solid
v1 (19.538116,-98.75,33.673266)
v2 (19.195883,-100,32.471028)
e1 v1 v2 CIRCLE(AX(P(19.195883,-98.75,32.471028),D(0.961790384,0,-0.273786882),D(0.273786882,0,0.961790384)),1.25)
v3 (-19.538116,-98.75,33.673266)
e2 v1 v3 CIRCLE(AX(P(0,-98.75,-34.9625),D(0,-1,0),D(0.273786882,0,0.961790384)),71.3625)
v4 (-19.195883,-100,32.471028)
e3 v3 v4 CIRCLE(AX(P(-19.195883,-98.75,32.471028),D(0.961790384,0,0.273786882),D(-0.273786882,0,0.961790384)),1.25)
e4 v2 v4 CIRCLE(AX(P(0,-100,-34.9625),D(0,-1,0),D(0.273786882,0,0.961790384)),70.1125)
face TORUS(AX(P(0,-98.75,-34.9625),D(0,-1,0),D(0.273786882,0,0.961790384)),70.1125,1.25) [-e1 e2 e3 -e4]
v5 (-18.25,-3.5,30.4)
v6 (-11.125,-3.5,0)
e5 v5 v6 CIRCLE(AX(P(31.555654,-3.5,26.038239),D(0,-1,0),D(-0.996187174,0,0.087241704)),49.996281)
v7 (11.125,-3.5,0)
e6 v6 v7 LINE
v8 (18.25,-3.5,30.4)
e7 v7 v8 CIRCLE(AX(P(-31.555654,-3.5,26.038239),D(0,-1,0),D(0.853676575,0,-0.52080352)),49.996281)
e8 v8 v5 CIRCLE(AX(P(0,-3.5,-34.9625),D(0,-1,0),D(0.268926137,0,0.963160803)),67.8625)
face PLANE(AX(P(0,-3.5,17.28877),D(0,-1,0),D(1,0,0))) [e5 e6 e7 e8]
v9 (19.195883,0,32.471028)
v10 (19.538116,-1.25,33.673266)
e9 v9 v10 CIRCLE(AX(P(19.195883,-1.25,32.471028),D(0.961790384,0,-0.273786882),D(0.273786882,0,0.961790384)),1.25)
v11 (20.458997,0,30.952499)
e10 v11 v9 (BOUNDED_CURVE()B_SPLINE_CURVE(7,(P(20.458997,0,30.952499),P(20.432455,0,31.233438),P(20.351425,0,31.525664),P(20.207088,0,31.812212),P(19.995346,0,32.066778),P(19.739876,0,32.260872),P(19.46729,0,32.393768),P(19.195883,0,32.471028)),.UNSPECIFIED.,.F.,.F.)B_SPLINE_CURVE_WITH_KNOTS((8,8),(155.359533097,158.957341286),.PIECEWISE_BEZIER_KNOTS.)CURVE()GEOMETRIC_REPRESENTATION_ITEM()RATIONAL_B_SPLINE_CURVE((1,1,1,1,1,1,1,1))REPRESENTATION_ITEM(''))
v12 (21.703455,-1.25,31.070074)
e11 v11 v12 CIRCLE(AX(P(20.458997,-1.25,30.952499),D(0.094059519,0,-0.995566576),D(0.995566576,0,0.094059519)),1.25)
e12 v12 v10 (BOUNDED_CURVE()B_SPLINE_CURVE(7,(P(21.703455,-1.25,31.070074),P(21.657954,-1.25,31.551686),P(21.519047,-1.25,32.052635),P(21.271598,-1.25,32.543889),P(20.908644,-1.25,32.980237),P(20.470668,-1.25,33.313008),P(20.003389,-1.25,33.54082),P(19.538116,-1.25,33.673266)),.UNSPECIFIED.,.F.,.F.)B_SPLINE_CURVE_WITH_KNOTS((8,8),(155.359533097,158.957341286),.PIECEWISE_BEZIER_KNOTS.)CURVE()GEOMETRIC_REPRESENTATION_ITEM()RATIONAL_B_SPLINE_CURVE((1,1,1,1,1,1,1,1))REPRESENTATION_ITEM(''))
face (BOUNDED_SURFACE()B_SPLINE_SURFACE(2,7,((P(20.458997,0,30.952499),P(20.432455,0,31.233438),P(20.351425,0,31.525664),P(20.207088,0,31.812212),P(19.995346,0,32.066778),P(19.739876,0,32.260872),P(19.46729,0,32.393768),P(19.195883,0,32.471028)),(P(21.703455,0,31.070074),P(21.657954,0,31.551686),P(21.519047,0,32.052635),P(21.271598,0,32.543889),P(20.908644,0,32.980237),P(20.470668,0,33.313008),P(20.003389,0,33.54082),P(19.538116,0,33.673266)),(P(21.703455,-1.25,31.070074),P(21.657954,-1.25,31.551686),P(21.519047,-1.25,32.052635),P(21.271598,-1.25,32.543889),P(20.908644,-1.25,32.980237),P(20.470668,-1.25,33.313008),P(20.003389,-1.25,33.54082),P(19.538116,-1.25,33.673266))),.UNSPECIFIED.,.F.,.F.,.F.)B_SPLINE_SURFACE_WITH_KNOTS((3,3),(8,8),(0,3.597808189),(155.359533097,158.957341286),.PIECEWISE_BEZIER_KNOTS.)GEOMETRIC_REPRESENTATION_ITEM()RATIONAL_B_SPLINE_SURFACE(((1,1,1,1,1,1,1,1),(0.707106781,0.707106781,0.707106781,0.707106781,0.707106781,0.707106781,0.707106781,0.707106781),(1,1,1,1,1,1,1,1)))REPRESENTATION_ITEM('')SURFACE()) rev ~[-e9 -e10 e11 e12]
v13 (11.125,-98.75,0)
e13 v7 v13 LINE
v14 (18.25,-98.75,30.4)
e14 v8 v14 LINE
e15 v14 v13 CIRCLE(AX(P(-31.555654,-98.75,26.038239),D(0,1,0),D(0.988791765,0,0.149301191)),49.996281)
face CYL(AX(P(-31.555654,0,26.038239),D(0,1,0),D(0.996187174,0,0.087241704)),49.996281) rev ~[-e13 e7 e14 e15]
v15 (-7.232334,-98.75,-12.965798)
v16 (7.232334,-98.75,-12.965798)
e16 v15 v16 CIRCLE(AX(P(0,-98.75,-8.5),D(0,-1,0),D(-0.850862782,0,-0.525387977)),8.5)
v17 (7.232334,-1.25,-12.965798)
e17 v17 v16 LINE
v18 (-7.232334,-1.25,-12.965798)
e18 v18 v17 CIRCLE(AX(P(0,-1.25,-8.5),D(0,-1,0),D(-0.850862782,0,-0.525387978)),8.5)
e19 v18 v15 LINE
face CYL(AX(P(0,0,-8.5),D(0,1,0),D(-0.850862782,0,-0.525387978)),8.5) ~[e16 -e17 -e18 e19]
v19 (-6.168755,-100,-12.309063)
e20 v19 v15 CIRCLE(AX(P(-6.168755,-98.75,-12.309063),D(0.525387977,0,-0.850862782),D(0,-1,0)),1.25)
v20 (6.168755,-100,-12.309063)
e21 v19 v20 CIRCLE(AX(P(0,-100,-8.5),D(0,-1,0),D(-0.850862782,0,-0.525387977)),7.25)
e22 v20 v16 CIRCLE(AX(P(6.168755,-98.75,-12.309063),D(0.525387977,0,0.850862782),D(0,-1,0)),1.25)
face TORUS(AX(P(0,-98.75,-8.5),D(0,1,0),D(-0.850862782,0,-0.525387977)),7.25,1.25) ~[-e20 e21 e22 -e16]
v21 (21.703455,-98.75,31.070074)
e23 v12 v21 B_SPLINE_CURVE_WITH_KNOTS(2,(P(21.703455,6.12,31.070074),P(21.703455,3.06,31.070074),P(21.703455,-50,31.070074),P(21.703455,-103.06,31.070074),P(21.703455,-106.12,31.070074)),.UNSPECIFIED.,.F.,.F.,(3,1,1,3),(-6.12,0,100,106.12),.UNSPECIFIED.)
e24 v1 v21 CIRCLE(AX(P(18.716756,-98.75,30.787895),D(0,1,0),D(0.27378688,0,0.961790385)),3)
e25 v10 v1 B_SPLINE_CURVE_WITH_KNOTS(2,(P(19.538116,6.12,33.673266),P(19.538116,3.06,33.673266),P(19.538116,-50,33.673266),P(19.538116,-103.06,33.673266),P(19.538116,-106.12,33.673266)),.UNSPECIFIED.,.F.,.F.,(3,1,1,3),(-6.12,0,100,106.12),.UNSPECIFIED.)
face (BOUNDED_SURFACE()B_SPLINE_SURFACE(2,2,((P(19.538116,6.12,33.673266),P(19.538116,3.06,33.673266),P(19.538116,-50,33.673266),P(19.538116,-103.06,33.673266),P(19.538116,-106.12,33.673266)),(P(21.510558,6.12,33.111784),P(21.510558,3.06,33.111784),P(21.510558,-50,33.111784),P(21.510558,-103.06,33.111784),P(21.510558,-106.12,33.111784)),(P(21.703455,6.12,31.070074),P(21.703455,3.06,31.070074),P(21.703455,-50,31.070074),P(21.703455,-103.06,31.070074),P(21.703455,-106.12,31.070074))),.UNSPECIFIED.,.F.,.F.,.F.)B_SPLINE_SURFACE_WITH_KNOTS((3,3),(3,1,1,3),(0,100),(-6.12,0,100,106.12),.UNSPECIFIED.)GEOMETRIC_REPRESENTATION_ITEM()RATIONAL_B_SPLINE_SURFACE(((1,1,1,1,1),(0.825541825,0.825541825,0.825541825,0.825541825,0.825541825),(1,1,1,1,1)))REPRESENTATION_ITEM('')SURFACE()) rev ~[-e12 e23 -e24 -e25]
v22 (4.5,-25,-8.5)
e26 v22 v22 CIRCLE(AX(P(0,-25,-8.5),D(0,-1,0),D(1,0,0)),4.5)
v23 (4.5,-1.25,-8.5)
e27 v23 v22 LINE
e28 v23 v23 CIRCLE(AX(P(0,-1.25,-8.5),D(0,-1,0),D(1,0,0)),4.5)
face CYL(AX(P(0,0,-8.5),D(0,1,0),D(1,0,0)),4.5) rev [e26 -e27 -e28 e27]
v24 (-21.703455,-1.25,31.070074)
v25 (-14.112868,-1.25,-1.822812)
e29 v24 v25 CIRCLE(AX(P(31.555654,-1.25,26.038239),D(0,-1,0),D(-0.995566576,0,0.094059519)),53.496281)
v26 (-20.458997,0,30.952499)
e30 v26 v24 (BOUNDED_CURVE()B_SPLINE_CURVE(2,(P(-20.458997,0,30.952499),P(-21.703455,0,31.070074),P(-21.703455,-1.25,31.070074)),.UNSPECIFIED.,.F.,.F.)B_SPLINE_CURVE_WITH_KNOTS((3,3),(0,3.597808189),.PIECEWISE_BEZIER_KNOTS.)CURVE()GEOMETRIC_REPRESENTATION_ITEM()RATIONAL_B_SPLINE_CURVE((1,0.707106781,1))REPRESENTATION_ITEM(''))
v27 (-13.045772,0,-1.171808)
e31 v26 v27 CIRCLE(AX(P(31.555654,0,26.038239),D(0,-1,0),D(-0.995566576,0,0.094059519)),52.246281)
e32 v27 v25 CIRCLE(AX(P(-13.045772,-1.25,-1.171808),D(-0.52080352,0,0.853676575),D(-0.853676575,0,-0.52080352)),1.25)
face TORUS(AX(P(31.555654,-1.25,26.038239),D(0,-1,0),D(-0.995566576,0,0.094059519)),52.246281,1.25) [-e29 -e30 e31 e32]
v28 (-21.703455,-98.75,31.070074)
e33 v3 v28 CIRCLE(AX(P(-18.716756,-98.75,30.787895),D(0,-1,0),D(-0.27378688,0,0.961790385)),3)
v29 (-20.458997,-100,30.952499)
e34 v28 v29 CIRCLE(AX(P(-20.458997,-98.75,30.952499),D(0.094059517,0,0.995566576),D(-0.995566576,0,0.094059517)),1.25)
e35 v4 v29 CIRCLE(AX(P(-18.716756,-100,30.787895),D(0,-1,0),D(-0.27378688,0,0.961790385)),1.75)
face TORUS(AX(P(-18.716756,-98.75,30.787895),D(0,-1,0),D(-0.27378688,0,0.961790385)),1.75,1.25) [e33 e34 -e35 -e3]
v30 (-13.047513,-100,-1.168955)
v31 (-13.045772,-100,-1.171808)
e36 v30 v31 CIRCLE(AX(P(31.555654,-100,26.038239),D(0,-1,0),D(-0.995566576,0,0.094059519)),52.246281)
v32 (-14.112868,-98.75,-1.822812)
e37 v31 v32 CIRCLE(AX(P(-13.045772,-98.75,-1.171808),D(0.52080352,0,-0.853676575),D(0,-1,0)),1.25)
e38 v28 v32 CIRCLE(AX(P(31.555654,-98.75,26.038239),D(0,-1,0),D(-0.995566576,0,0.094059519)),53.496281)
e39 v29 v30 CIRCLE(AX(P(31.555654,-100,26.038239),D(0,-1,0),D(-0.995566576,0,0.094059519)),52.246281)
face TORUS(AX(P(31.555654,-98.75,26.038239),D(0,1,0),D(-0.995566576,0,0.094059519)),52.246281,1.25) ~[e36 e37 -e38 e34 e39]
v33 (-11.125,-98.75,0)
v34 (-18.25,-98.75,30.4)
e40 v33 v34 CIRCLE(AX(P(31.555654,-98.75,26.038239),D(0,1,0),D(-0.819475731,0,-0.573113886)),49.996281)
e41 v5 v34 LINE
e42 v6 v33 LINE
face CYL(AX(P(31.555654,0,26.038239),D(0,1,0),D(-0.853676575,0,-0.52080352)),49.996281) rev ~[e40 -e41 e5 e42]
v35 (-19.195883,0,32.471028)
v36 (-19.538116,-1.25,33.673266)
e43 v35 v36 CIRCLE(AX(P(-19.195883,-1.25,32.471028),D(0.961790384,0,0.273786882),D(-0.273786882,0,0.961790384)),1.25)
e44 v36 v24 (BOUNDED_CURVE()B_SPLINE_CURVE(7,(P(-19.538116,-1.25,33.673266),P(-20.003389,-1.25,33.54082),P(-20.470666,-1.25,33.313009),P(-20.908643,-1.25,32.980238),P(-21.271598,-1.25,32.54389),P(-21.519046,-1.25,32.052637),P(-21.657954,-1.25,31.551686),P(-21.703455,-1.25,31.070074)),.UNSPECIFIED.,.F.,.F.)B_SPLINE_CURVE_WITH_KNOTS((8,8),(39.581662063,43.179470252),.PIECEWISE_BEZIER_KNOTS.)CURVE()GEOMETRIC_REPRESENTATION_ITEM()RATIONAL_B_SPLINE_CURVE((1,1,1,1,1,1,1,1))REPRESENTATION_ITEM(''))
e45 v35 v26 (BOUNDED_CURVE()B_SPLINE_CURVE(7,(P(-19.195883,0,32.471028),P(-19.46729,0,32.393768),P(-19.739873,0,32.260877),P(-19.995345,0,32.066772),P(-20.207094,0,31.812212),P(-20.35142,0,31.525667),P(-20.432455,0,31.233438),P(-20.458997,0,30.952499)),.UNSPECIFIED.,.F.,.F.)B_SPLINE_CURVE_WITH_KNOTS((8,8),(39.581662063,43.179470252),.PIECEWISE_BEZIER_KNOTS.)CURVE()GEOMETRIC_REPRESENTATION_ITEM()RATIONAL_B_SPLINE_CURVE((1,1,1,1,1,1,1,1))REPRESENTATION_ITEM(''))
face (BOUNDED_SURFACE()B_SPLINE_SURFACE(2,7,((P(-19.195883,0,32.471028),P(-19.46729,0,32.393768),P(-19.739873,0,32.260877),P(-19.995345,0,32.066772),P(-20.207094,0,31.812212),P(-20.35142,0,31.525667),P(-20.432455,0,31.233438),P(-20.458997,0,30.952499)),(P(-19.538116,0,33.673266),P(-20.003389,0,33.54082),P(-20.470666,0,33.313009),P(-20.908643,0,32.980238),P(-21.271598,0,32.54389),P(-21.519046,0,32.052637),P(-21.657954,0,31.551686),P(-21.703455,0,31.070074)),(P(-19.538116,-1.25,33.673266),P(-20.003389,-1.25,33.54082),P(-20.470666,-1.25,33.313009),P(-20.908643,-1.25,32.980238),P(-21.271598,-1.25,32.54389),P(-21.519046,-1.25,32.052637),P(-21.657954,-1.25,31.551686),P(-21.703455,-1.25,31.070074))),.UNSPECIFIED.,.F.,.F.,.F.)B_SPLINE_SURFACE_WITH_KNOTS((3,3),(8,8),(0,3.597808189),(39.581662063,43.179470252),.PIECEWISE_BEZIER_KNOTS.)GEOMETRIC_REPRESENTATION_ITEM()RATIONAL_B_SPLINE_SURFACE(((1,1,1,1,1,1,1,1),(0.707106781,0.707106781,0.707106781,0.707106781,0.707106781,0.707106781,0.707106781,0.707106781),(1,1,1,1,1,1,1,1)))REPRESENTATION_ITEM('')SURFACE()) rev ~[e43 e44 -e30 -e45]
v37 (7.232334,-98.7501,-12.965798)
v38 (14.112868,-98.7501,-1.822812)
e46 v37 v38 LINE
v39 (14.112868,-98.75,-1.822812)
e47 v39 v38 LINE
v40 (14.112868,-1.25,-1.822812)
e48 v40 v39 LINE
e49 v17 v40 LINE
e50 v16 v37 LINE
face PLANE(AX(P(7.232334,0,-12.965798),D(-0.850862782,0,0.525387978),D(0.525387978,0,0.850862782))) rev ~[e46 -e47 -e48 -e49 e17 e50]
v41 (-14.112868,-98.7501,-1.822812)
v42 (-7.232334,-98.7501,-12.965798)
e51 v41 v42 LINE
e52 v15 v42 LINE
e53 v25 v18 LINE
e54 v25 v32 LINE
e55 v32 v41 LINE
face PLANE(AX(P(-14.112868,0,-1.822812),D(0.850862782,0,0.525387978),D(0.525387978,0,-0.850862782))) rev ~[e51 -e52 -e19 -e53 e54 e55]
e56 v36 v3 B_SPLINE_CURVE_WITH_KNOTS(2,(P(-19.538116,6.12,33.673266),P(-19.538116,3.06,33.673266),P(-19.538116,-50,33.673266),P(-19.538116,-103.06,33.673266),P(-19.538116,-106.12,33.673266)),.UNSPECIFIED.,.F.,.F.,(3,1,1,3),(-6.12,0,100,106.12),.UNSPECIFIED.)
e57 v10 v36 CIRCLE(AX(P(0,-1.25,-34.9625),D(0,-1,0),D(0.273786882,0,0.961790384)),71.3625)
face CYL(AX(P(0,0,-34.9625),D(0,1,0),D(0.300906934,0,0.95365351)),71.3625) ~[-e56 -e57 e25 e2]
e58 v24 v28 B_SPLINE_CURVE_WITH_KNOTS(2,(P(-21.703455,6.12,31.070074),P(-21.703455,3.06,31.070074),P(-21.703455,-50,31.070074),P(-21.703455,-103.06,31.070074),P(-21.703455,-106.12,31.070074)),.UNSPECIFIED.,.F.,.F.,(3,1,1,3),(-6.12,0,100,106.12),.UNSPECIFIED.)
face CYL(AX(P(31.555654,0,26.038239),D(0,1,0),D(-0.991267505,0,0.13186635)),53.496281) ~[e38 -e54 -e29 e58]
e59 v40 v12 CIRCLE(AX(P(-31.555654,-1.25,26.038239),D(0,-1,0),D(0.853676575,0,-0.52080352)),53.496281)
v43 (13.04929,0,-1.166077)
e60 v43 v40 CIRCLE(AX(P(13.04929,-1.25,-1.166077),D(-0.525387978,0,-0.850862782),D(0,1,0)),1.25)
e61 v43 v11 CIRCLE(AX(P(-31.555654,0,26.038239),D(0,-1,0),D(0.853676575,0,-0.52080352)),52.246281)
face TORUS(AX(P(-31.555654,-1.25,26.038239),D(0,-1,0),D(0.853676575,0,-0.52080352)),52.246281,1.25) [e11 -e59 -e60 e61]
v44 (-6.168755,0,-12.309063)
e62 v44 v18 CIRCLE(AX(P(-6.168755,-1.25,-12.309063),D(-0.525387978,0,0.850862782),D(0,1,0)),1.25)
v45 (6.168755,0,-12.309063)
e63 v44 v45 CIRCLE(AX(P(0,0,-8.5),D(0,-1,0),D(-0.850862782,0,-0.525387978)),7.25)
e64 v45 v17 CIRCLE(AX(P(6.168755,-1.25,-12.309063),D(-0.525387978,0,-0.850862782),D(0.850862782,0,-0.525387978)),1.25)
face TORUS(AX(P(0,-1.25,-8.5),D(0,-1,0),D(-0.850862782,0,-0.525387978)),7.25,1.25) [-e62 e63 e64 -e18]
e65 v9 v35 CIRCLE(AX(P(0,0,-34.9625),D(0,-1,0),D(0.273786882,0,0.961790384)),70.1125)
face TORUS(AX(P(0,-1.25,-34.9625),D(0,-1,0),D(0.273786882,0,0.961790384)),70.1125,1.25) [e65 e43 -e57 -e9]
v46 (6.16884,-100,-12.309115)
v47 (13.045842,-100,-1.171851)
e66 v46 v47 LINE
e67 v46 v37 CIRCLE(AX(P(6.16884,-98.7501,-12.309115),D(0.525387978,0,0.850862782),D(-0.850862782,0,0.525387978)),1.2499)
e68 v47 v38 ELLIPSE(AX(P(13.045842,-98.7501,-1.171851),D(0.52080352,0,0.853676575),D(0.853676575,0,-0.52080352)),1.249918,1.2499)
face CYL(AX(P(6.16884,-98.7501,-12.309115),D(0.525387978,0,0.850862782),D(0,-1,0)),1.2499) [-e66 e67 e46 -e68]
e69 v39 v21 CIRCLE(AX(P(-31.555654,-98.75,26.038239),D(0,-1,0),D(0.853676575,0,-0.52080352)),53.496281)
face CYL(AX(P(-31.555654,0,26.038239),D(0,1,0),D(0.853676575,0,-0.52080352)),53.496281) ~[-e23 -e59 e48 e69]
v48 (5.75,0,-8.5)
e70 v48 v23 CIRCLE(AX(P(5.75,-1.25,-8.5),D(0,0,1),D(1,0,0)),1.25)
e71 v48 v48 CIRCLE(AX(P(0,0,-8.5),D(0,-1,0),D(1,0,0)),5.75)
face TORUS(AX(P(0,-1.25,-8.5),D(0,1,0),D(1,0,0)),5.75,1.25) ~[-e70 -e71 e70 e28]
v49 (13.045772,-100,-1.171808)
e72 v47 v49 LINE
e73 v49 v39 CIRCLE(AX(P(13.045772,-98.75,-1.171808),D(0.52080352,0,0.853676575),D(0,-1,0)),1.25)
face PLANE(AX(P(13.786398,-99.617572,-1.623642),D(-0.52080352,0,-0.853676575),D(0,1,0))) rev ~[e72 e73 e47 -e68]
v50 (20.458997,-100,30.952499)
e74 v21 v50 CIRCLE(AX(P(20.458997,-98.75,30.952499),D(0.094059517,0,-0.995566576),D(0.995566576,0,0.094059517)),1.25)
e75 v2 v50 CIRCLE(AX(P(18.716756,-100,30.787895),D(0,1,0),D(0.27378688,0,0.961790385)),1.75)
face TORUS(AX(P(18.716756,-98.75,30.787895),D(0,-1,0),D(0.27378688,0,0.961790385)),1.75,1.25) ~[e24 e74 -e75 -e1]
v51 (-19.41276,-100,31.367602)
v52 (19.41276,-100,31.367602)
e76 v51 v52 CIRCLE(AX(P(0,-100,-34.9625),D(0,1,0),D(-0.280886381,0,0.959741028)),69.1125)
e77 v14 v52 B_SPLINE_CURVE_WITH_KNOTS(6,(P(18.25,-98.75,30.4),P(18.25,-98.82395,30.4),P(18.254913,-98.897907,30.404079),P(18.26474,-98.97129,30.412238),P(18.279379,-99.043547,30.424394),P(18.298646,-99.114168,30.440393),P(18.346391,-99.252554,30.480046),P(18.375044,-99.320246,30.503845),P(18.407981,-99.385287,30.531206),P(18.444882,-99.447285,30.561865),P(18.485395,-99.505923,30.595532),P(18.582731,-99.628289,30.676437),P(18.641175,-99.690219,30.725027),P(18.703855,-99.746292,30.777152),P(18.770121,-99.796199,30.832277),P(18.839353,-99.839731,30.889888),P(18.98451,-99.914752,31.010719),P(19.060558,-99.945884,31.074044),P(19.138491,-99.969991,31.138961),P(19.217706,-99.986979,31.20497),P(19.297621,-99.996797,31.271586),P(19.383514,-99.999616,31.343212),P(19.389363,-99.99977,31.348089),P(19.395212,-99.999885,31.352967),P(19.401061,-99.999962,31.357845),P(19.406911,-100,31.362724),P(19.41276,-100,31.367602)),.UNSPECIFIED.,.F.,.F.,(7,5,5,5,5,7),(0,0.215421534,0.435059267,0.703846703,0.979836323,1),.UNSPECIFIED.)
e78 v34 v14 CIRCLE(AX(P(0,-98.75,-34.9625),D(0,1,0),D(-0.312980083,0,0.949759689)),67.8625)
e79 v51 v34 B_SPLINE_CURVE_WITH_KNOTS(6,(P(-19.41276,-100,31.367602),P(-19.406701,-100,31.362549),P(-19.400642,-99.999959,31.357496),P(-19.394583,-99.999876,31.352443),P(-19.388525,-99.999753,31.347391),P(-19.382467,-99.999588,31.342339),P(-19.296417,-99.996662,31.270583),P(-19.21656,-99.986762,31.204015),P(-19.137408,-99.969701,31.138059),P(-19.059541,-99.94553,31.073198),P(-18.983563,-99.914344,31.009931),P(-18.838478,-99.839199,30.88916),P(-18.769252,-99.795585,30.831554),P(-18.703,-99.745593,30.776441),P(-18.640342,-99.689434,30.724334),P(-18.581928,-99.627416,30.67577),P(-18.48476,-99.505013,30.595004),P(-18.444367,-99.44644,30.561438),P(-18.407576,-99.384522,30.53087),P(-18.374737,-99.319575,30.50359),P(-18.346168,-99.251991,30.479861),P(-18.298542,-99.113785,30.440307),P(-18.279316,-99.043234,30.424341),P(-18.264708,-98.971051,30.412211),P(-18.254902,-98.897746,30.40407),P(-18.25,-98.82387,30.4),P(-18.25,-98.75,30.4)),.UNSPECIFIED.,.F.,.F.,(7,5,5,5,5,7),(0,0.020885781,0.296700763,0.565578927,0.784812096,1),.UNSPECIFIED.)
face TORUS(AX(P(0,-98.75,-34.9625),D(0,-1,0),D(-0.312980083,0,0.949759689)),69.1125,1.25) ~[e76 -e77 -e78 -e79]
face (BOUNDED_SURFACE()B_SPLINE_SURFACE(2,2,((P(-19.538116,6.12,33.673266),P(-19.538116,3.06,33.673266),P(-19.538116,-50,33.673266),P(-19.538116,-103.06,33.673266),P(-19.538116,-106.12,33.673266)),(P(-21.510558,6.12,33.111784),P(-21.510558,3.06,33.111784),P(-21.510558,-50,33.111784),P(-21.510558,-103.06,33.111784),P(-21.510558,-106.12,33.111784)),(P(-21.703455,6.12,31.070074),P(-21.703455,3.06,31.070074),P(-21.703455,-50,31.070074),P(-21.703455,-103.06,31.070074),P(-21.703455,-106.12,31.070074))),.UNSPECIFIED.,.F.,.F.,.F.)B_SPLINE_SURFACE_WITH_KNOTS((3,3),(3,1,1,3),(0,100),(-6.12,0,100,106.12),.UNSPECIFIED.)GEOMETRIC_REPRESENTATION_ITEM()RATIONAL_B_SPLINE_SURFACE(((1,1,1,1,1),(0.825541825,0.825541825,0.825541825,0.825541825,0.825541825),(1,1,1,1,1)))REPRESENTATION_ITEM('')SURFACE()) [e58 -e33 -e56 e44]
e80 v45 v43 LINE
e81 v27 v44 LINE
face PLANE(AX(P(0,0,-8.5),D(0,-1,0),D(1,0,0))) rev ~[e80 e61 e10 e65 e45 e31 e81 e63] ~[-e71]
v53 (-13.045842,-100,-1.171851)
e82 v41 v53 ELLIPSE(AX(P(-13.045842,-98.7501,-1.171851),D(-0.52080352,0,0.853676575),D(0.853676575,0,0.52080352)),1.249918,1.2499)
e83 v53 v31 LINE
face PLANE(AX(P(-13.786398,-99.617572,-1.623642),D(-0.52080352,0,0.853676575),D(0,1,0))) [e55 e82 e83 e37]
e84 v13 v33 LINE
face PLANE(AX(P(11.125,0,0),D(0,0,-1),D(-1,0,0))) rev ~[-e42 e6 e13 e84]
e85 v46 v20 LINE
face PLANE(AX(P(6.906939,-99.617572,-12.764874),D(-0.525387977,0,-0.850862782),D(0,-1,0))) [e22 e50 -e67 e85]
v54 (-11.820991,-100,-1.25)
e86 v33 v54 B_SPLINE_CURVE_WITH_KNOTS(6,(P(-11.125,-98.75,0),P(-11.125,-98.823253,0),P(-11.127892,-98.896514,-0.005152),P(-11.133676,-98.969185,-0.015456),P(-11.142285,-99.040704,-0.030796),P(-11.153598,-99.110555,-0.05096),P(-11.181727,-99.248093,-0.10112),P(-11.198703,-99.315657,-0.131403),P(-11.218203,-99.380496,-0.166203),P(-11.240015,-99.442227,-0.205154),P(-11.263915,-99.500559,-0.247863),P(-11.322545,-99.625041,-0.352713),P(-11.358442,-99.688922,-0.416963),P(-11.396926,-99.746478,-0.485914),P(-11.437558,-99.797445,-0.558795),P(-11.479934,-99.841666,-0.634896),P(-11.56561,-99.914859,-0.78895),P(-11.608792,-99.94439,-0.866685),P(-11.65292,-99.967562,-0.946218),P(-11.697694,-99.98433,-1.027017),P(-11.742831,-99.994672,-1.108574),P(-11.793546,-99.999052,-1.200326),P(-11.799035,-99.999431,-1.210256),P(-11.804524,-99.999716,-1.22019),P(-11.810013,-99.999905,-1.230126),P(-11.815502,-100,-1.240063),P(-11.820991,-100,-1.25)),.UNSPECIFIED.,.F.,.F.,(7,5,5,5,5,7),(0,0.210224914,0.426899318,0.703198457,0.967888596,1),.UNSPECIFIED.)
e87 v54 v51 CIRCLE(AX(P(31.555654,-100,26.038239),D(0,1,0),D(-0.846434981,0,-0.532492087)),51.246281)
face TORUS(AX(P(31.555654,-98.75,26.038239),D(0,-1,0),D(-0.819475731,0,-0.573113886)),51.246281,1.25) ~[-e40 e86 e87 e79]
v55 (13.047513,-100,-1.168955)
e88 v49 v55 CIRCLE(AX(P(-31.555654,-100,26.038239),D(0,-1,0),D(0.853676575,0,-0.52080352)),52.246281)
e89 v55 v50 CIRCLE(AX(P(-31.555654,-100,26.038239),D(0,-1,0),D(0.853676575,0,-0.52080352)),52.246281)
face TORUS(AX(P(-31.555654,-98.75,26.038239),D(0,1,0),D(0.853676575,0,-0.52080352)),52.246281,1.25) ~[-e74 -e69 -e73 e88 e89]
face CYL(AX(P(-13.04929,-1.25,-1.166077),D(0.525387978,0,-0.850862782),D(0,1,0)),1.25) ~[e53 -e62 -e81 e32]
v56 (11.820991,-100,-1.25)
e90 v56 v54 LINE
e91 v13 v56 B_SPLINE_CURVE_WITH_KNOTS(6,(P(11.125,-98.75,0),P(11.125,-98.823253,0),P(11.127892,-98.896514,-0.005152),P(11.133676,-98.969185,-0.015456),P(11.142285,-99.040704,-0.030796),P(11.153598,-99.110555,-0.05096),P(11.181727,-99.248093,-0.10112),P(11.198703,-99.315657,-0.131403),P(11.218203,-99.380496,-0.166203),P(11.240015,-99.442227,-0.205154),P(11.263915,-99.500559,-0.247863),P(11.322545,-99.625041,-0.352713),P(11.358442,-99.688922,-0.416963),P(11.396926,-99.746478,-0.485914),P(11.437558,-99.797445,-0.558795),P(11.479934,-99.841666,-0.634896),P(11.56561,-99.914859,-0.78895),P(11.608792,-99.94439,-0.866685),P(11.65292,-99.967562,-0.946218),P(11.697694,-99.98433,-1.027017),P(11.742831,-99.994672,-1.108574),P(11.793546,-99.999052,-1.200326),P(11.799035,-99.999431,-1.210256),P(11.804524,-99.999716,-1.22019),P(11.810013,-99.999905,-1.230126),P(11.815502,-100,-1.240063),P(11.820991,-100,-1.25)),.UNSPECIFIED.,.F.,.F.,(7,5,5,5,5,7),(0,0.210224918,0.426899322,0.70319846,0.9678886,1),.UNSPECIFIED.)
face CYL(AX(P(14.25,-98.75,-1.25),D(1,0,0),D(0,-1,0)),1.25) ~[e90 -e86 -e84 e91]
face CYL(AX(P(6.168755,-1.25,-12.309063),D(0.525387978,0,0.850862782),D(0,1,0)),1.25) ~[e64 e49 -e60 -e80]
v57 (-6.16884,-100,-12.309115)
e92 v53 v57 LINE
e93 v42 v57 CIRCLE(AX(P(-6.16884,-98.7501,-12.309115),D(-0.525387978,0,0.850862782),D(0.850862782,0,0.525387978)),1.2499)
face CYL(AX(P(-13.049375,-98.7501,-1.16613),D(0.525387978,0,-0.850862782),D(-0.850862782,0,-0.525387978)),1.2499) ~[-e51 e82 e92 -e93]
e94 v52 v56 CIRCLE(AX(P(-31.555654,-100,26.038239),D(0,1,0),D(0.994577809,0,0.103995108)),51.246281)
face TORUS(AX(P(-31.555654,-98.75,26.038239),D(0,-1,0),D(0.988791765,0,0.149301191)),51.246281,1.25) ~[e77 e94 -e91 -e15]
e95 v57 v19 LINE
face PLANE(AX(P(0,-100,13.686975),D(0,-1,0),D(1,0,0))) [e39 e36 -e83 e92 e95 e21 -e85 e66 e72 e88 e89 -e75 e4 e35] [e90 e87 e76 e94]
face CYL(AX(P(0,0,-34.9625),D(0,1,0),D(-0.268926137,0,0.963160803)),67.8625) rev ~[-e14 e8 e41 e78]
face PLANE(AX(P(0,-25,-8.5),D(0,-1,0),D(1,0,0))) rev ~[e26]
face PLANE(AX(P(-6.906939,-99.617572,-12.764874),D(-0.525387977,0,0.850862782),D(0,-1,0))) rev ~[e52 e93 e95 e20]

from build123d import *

# Parameters (mm, degrees)
F0_R         = 4.5
F1_DEPTH     = 100
F2_DEPTH     = 3.5
F3_DEPTH     = 100
F4_DEPTH     = 25
F5_R         = 3
F6_T3_ANGLE  = 31.7794665587
F6_T6_ANGLE  = 68.7130750893
F6_T9_ANGLE  = 68.7130750893
F6_T12_ANGLE = 36.7833572648
F6_T15_ANGLE = 36.7833572648
F6_T18_DEPTH = 13.096101665
F6_T21_DEPTH = 13.096101665
F6_T24_ANGLE = 116.6112692326
F6_T27_ANGLE = 36.4778324905
F6_S28_R     = 49.99628125
F6_T29_DEPTH = 26
F6_S30_R     = 49.99628125
F6_T31_DEPTH = 26
F6_T34_ANGLE = 43.5540849409
F6_S35_R     = 67.8625
F6_T36_DEPTH = 23
F6_T40_DEPTH = 28.5
F6_S41_R     = 49.99628125
F6_T42_DEPTH = 16
F6_S43_R     = 49.99628125
F6_T44_DEPTH = 16
F6_T47_ANGLE = 43.5540849409
F6_S48_R     = 67.8625
F6_T49_DEPTH = 23
F6_T54_ANGLE = 36.4778324905
F6_S55_R     = 49.99628125
F6_T56_DEPTH = 26
F6_T59_ANGLE = 43.5540849409
F6_S60_R     = 67.8625
F6_T61_DEPTH = 23
F6_T66_ANGLE = 36.4778324905
F6_S67_R     = 49.99628125
F6_T68_DEPTH = 26
F6_T71_ANGLE = 43.5540849409
F6_S72_R     = 67.8625
F6_T73_DEPTH = 23
F6_T78_ANGLE = 43.5540849409
F6_T82_DEPTH = 28.5
F6_S83_R     = 49.99628125
F6_T84_DEPTH = 16
F6_T89_DEPTH = 28.5
F6_S90_R     = 49.99628125
F6_T91_DEPTH = 16
F6_T94_ANGLE = 43.5540849409
F7_R         = 1.25
F7_R_2       = 1.2499


# Not quite as in the source:
# - a fillet or chamfer that OpenCascade refuses, or shapes differently, is made with other operations: its cross-section is extruded or revolved along the edge and cut away or added
# - a fillet or chamfer is up to 0.001 mm smaller than in the source, because OpenCascade refuses the exact size


with BuildPart() as f1:
    # F0 (on Front) → F1 (new body)
    with BuildSketch(Plane.XZ):
        with BuildLine():
            ThreePointArc((21.473471105, 33.0925985963), (0, 36.4), (-21.473471105, 33.0925985963))
            ThreePointArc((-21.473471105, 33.0925985963), (-20.7900990818, 15.0031031025), (-14.1128680108, -1.8228123189))
            Line((-14.1128680108, -1.8228123189), (-7.2323336433, -12.9657978092))
            ThreePointArc((-7.2323336433, -12.9657978092), (0, -17), (7.2323336433, -12.9657978092))
            Line((7.2323336433, -12.9657978092), (14.1128680108, -1.8228123189))
            ThreePointArc((14.1128680108, -1.8228123189), (20.7900990818, 15.0031031025), (21.473471105, 33.0925985963))
        make_face()
        with Locations((0, -8.5)):
            Circle(F0_R, mode=Mode.SUBTRACT)
        with BuildLine():
            ThreePointArc((18.25, 30.4), (17.1215407764, 14.629521693), (11.125, 0))
            Line((11.125, 0), (-11.125, 0))
            ThreePointArc((-11.125, 0), (-17.1215407764, 14.629521693), (-18.25, 30.4))
            ThreePointArc((-18.25, 30.4), (0, 32.9), (18.25, 30.4))
        make_face(mode=Mode.SUBTRACT)
    extrude(amount=F1_DEPTH)

    # F0 (on Front) → F2 (join)
    with BuildSketch(Plane.XZ):
        with BuildLine():
            Line((-11.125, 0), (11.125, 0))
            ThreePointArc((11.125, 0), (17.1215407764, 14.629521693), (18.25, 30.4))
            ThreePointArc((18.25, 30.4), (0, 32.9), (-18.25, 30.4))
            ThreePointArc((-18.25, 30.4), (-17.1215407764, 14.629521693), (-11.125, 0))
        make_face()
    extrude(amount=F2_DEPTH)

    # F0 (on Front) → F3 (join)
    with BuildSketch(Plane.XZ):
        with Locations((0, -8.5)):
            Circle(F0_R)
    extrude(amount=F3_DEPTH)

    # F0 (on Front) → F4 (cut)
    with BuildSketch(Plane.XZ):
        with Locations((0, -8.5)):
            Circle(F0_R)
    extrude(amount=F4_DEPTH, mode=Mode.SUBTRACT)

    # F5
    f5_edges = [f1.edges().sort_by_distance(p)[0] for p in [
        (-21.473471, -50, 33.092599),
        (21.473471, -50, 33.092599),
    ]]
    fillet(f5_edges, radius=F5_R)

    # F6: fillet of radius 1.25 on 12 edges, made by hand


with BuildPart() as f6_tool1:
    # F6_s2 → F6_t3 (revolve)
    with BuildSketch(Plane(origin=(9.2065209471, 0, -2.6207630089), x_dir=(0, 1, 0), z_dir=(0.9617903843, 0, -0.2737868817))):
        with BuildLine():
            ThreePointArc((-98.75, 37.7359036877), (-99.6338834765, 37.3697871642), (-100, 36.4859036877))
            Line((-100, 36.4859036877), (-100, 37.7359036877))
            Line((-100, 37.7359036877), (-98.75, 37.7359036877))
        make_face()
    revolve(axis=Axis((0, -100, -34.9625), (0, -1, 0)), revolution_arc=F6_T3_ANGLE)


with BuildPart() as f6_tool4:
    # F6_s5 → F6_t6 (revolve)
    with BuildSketch(Plane(origin=(9.2065210076, 0, -2.6207630106), x_dir=(0, 1, 0), z_dir=(-0.9617903848, 0, 0.2737868802))):
        with BuildLine():
            ThreePointArc((-98.75, -37.7359036714), (-99.6338834765, -37.3697871478), (-100, -36.4859036714))
            Line((-100, -36.4859036714), (-100, -37.7359036728))
            Line((-100, -37.7359036728), (-98.75, -37.7359036714))
        make_face()
    revolve(axis=Axis((18.7167557078, -100, 30.7878951544), (0, 1, 0)), revolution_arc=F6_T6_ANGLE)


with BuildPart() as f6_tool7:
    # F6_s8 → F6_t9 (revolve)
    with BuildSketch(Plane(origin=(-9.2065210076, 0, -2.6207630106), x_dir=(0, 1, 0), z_dir=(0.9617903848, 0, 0.2737868802))):
        with BuildLine():
            ThreePointArc((-98.75, 37.7359036714), (-99.6338834765, 37.3697871478), (-100, 36.4859036714))
            Line((-100, 36.4859036714), (-100, 37.7359036728))
            Line((-100, 37.7359036728), (-98.75, 37.7359036714))
        make_face()
    revolve(axis=Axis((-18.7167557078, -100, 30.7878951544), (0, -1, 0)), revolution_arc=F6_T9_ANGLE)


with BuildPart() as f6_tool10:
    # F6_s11 → F6_t12 (revolve)
    with BuildSketch(Plane(origin=(3.0175039055, 0, 4.9461501321), x_dir=(0, 1, 0), z_dir=(-0.5208035197, 0, -0.8536765745))):
        with BuildLine():
            ThreePointArc((-100, 11.7471518916), (-99.6338834765, 12.631035368), (-98.75, 12.9971518916))
            Line((-98.75, 12.9971518916), (-100, 12.9971518916))
            Line((-100, 12.9971518916), (-100, 11.7471518916))
        make_face()
    revolve(axis=Axis((-31.5556541163, -100, 26.038239246), (0, -1, 0)), revolution_arc=F6_T12_ANGLE)


with BuildPart() as f6_tool13:
    # F6_s14 → F6_t15 (revolve)
    with BuildSketch(Plane(origin=(2.7174651154, 0, 28.7628246621), x_dir=(0, 1, 0), z_dir=(0.0940595186, 0, 0.9955665759))):
        with BuildLine():
            ThreePointArc((-100, 23.2796709798), (-99.6338834765, 24.1635544563), (-98.75, 24.5296709798))
            Line((-98.75, 24.5296709798), (-100, 24.5296709798))
            Line((-100, 24.5296709798), (-100, 23.2796709798))
        make_face()
    revolve(axis=Axis((31.5556541163, -100, 26.038239246), (0, -1, 0)), revolution_arc=F6_T15_ANGLE)


with BuildPart() as f6_tool16:
    # F6_s17 → F6_t18 (new body)
    with BuildSketch(Plane(origin=(-3.7997811458, 0, -6.1537235209), x_dir=(0, 1, 0), z_dir=(0.5253879775, 0, 0.8508627816))):
        with BuildLine():
            ThreePointArc((-100, -11.7157978092), (-99.6338834765, -12.5996812857), (-98.75, -12.9657978092))
            Line((-98.75, -12.9657978092), (-100, -12.9657978092))
            Line((-100, -12.9657978092), (-100, -11.7157978092))
        make_face()
    extrude(amount=F6_T18_DEPTH)


with BuildPart() as f6_tool19:
    # F6_s20 → F6_t21 (new body)
    with BuildSketch(Plane(origin=(-3.0807532218, 0, 4.9892619694), x_dir=(0, 1, 0), z_dir=(0.5253879775, 0, -0.8508627816))):
        with BuildLine():
            ThreePointArc((-100, -11.7157978092), (-99.6338834765, -12.5996812857), (-98.75, -12.9657978092))
            Line((-98.75, -12.9657978092), (-100, -12.9657978092))
            Line((-100, -12.9657978092), (-100, -11.7157978092))
        make_face()
    extrude(amount=F6_T21_DEPTH)


with BuildPart() as f6_tool22:
    # F6_s23 → F6_t24 (revolve)
    with BuildSketch(Plane(origin=(3.7997811458, 0, -6.1537235209), x_dir=(0, 1, 0), z_dir=(-0.5253879775, 0, 0.8508627816))):
        with BuildLine():
            ThreePointArc((-100, 11.7157978092), (-99.6338834765, 12.5996812857), (-98.75, 12.9657978092))
            Line((-98.75, 12.9657978092), (-100, 12.9657978092))
            Line((-100, 12.9657978092), (-100, 11.7157978092))
        make_face()
    revolve(axis=Axis((0, -100, -8.5), (0, -1, 0)), revolution_arc=F6_T24_ANGLE)


with BuildPart() as f6_tool25:
    # F6_s26 → F6_t27 (revolve)
    with BuildSketch(Plane(origin=(-10.3928082362, 0, -3.4248052672), x_dir=(0, 1, 0), z_dir=(-0.9497596893, 0, -0.3129800832))):
        with BuildLine():
            ThreePointArc((-100, -35.9065268612), (-99.6338834765, -35.0226433847), (-98.75, -34.6565268612))
            Line((-98.75, -34.6565268612), (-100, -34.6565268612))
            Line((-100, -34.6565268612), (-100, -35.9065268612))
        make_face()
    revolve(axis=Axis((0, -100, -34.9625), (0, 1, 0)), revolution_arc=F6_T27_ANGLE)

    # F6_s28 → F6_t29 (intersect, symmetric)
    with BuildSketch(Plane.XZ.offset(98.9)):
        with Locations((-31.5556541163, 26.038239246)):
            Circle(F6_S28_R)
    extrude(amount=F6_T29_DEPTH, both=True, mode=Mode.INTERSECT)

    # F6_s30 → F6_t31 (intersect, symmetric)
    with BuildSketch(Plane.XZ.offset(98.9)):
        with Locations((31.5556541163, 26.038239246)):
            Circle(F6_S30_R)
    extrude(amount=F6_T31_DEPTH, both=True, mode=Mode.INTERSECT)


with BuildPart() as f6_tool32:
    # F6_s33 → F6_t34 (revolve)
    with BuildSketch(Plane(origin=(-4.5473698948, 0, 30.1163163037), x_dir=(0, 1, 0), z_dir=(-0.1493011914, 0, 0.9887917649))):
        with BuildLine():
            ThreePointArc((-100, -23.9318504655), (-99.6338834765, -23.0479669891), (-98.75, -22.6818504655))
            Line((-98.75, -22.6818504655), (-100, -22.6818504655))
            Line((-100, -22.6818504655), (-100, -23.9318504655))
        make_face()
    revolve(axis=Axis((-31.5556541163, -100, 26.038239246), (0, 1, 0)), revolution_arc=F6_T34_ANGLE)

    # F6_s35 → F6_t36 (intersect, symmetric)
    with BuildSketch(Plane.XZ.offset(98.9)):
        with Locations((0, -34.9625)):
            Circle(F6_S35_R)
    extrude(amount=F6_T36_DEPTH, both=True, mode=Mode.INTERSECT)

    split(bisect_by=Plane.XY, keep=Keep.TOP)


with BuildPart() as f6_tool38:
    # F6_s39 → F6_t40 (new body)
    with BuildSketch(Plane.YZ.offset(14.25)):
        with BuildLine():
            ThreePointArc((-100, -1.25), (-99.6338834765, -0.3661165235), (-98.75, 0))
            Line((-98.75, 0), (-100, 0))
            Line((-100, 0), (-100, -1.25))
        make_face()
    extrude(amount=-F6_T40_DEPTH)

    # F6_s41 → F6_t42 (intersect, symmetric)
    with BuildSketch(Plane.XZ.offset(99.4)):
        with Locations((-31.5556541163, 26.038239246)):
            Circle(F6_S41_R)
    extrude(amount=F6_T42_DEPTH, both=True, mode=Mode.INTERSECT)

    # F6_s43 → F6_t44 (intersect, symmetric)
    with BuildSketch(Plane.XZ.offset(99.4)):
        with Locations((31.5556541163, 26.038239246)):
            Circle(F6_S43_R)
    extrude(amount=F6_T44_DEPTH, both=True, mode=Mode.INTERSECT)


with BuildPart() as f6_tool45:
    # F6_s46 → F6_t47 (revolve)
    with BuildSketch(Plane(origin=(-1.8641799133, 0, 2.6655264084), x_dir=(0, 1, 0), z_dir=(0.5731138857, 0, -0.8194757312))):
        with BuildLine():
            ThreePointArc((-100, -10.4643120484), (-99.6338834765, -9.5804285719), (-98.75, -9.2143120484))
            Line((-98.75, -9.2143120484), (-100, -9.2143120484))
            Line((-100, -9.2143120484), (-100, -10.4643120484))
        make_face()
    revolve(axis=Axis((31.5556541163, -100, 26.038239246), (0, 1, 0)), revolution_arc=F6_T47_ANGLE)

    # F6_s48 → F6_t49 (intersect, symmetric)
    with BuildSketch(Plane.XZ.offset(98.9)):
        with Locations((0, -34.9625)):
            Circle(F6_S48_R)
    extrude(amount=F6_T49_DEPTH, both=True, mode=Mode.INTERSECT)

    split(bisect_by=Plane.XY, keep=Keep.TOP)


with BuildPart() as f6_tool52:
    # F6_s53 → F6_t54 (revolve)
    with BuildSketch(Plane(origin=(-10.3928082362, 0, -3.4248052672), x_dir=(0, 1, 0), z_dir=(-0.9497596893, 0, -0.3129800832))):
        with BuildLine():
            ThreePointArc((-100, -35.9065268612), (-99.6338834765, -35.0226433847), (-98.75, -34.6565268612))
            Line((-98.75, -34.6565268612), (-100, -34.6565268612))
            Line((-100, -34.6565268612), (-100, -35.9065268612))
        make_face()
    revolve(axis=Axis((0, -100, -34.9625), (0, 1, 0)), revolution_arc=F6_T54_ANGLE)

    # F6_s55 → F6_t56 (cut, symmetric)
    with BuildSketch(Plane.XZ.offset(98.9)):
        with Locations((31.5556541163, 26.038239246)):
            Circle(F6_S55_R)
    extrude(amount=F6_T56_DEPTH, both=True, mode=Mode.SUBTRACT)


with BuildPart() as f6_tool57:
    # F6_s58 → F6_t59 (revolve)
    with BuildSketch(Plane(origin=(-1.8641799133, 0, 2.6655264084), x_dir=(0, 1, 0), z_dir=(0.5731138857, 0, -0.8194757312))):
        with BuildLine():
            ThreePointArc((-100, -10.4643120484), (-99.6338834765, -9.5804285719), (-98.75, -9.2143120484))
            Line((-98.75, -9.2143120484), (-100, -9.2143120484))
            Line((-100, -9.2143120484), (-100, -10.4643120484))
        make_face()
    revolve(axis=Axis((31.5556541163, -100, 26.038239246), (0, 1, 0)), revolution_arc=F6_T59_ANGLE)

    # F6_s60 → F6_t61 (cut, symmetric)
    with BuildSketch(Plane.XZ.offset(98.9)):
        with Locations((0, -34.9625)):
            Circle(F6_S60_R)
    extrude(amount=F6_T61_DEPTH, both=True, mode=Mode.SUBTRACT)


with BuildPart() as f6_tool52_1:
    add(f6_tool52.part)

    # F6_t62: intersect F6_tool57
    add(f6_tool57.part, mode=Mode.INTERSECT)


with BuildPart() as f6_tool64:
    # F6_s65 → F6_t66 (revolve)
    with BuildSketch(Plane(origin=(-10.3928082362, 0, -3.4248052672), x_dir=(0, 1, 0), z_dir=(-0.9497596893, 0, -0.3129800832))):
        with BuildLine():
            ThreePointArc((-100, -35.9065268612), (-99.6338834765, -35.0226433847), (-98.75, -34.6565268612))
            Line((-98.75, -34.6565268612), (-100, -34.6565268612))
            Line((-100, -34.6565268612), (-100, -35.9065268612))
        make_face()
    revolve(axis=Axis((0, -100, -34.9625), (0, 1, 0)), revolution_arc=F6_T66_ANGLE)

    # F6_s67 → F6_t68 (cut, symmetric)
    with BuildSketch(Plane.XZ.offset(98.9)):
        with Locations((-31.5556541163, 26.038239246)):
            Circle(F6_S67_R)
    extrude(amount=F6_T68_DEPTH, both=True, mode=Mode.SUBTRACT)


with BuildPart() as f6_tool69:
    # F6_s70 → F6_t71 (revolve)
    with BuildSketch(Plane(origin=(-4.5473698948, 0, 30.1163163037), x_dir=(0, 1, 0), z_dir=(-0.1493011914, 0, 0.9887917649))):
        with BuildLine():
            ThreePointArc((-100, -23.9318504655), (-99.6338834765, -23.0479669891), (-98.75, -22.6818504655))
            Line((-98.75, -22.6818504655), (-100, -22.6818504655))
            Line((-100, -22.6818504655), (-100, -23.9318504655))
        make_face()
    revolve(axis=Axis((-31.5556541163, -100, 26.038239246), (0, 1, 0)), revolution_arc=F6_T71_ANGLE)

    # F6_s72 → F6_t73 (cut, symmetric)
    with BuildSketch(Plane.XZ.offset(98.9)):
        with Locations((0, -34.9625)):
            Circle(F6_S72_R)
    extrude(amount=F6_T73_DEPTH, both=True, mode=Mode.SUBTRACT)


with BuildPart() as f6_tool64_1:
    add(f6_tool64.part)

    # F6_t74: intersect F6_tool69
    add(f6_tool69.part, mode=Mode.INTERSECT)


with BuildPart() as f6_tool76:
    # F6_s77 → F6_t78 (revolve)
    with BuildSketch(Plane(origin=(-4.5473698948, 0, 30.1163163037), x_dir=(0, 1, 0), z_dir=(-0.1493011914, 0, 0.9887917649))):
        with BuildLine():
            ThreePointArc((-100, -23.9318504655), (-99.6338834765, -23.0479669891), (-98.75, -22.6818504655))
            Line((-98.75, -22.6818504655), (-100, -22.6818504655))
            Line((-100, -22.6818504655), (-100, -23.9318504655))
        make_face()
    revolve(axis=Axis((-31.5556541163, -100, 26.038239246), (0, 1, 0)), revolution_arc=F6_T78_ANGLE)

    split(bisect_by=Plane.XY, keep=Keep.BOTTOM)


with BuildPart() as f6_tool80:
    # F6_s81 → F6_t82 (new body)
    with BuildSketch(Plane.YZ.offset(14.25)):
        with BuildLine():
            ThreePointArc((-100, -1.25), (-99.6338834765, -0.3661165235), (-98.75, 0))
            Line((-98.75, 0), (-100, 0))
            Line((-100, 0), (-100, -1.25))
        make_face()
    extrude(amount=-F6_T82_DEPTH)

    # F6_s83 → F6_t84 (cut, symmetric)
    with BuildSketch(Plane.XZ.offset(99.4)):
        with Locations((-31.5556541163, 26.038239246)):
            Circle(F6_S83_R)
    extrude(amount=F6_T84_DEPTH, both=True, mode=Mode.SUBTRACT)


with BuildPart() as f6_tool76_1:
    add(f6_tool76.part)

    # F6_t85: intersect F6_tool80
    add(f6_tool80.part, mode=Mode.INTERSECT)


with BuildPart() as f6_tool87:
    # F6_s88 → F6_t89 (new body)
    with BuildSketch(Plane.YZ.offset(14.25)):
        with BuildLine():
            ThreePointArc((-100, -1.25), (-99.6338834765, -0.3661165235), (-98.75, 0))
            Line((-98.75, 0), (-100, 0))
            Line((-100, 0), (-100, -1.25))
        make_face()
    extrude(amount=-F6_T89_DEPTH)

    # F6_s90 → F6_t91 (cut, symmetric)
    with BuildSketch(Plane.XZ.offset(99.4)):
        with Locations((31.5556541163, 26.038239246)):
            Circle(F6_S90_R)
    extrude(amount=F6_T91_DEPTH, both=True, mode=Mode.SUBTRACT)


with BuildPart() as f6_tool92:
    # F6_s93 → F6_t94 (revolve)
    with BuildSketch(Plane(origin=(-1.8641799133, 0, 2.6655264084), x_dir=(0, 1, 0), z_dir=(0.5731138857, 0, -0.8194757312))):
        with BuildLine():
            ThreePointArc((-100, -10.4643120484), (-99.6338834765, -9.5804285719), (-98.75, -9.2143120484))
            Line((-98.75, -9.2143120484), (-100, -9.2143120484))
            Line((-100, -9.2143120484), (-100, -10.4643120484))
        make_face()
    revolve(axis=Axis((31.5556541163, -100, 26.038239246), (0, 1, 0)), revolution_arc=F6_T94_ANGLE)

    split(bisect_by=Plane.XY, keep=Keep.BOTTOM)


with BuildPart() as f6_tool87_1:
    add(f6_tool87.part)

    # F6_t96: intersect F6_tool92
    add(f6_tool92.part, mode=Mode.INTERSECT)


with BuildPart() as f1_1:
    add(f1.part)

    # F6_t97: cut F6_tool1, F6_tool4, F6_tool7, F6_tool10, F6_tool13, F6_tool16, F6_tool19, F6_tool22, F6_tool25, F6_tool32, F6_tool38, F6_tool45, F6_tool52, F6_tool64, F6_tool76, F6_tool87
    add([f6_tool1.part, f6_tool4.part, f6_tool7.part, f6_tool10.part, f6_tool13.part, f6_tool16.part, f6_tool19.part, f6_tool22.part, f6_tool25.part, f6_tool32.part, f6_tool38.part, f6_tool45.part, f6_tool52_1.part, f6_tool64_1.part, f6_tool76_1.part, f6_tool87_1.part], mode=Mode.SUBTRACT)

    # F7 (call 1 of 4: OpenCascade refuses the feature's edges together)
    f7_edges = [f1_1.edges().sort_by_distance(p)[0] for p in [
        (0, 0, 36.4),
        (21.023156, 0, 32.706362),
        (-21.023156, 0, 32.706362),
        (20.570679, 0, 14.00921),
        (-20.570679, 0, 14.00921),
        (10.672601, 0, -7.394305),
        (-10.672601, 0, -7.394305),
        (0, 0, -17),
    ]]
    fillet(f7_edges, radius=F7_R)

    # F7#2 (call 2 of 4)
    f7_2_edges = [f1_1.edges().sort_by_distance(p)[0] for p in [
        (-4.5, 0, -8.5),
    ]]
    fillet(f7_2_edges, radius=F7_R)

    # F7#3 (call 3 of 4) (radius 1.25 in the source; OpenCascade refuses exactly that, so slightly less here)
    f7_3_edges = [f1_1.edges().sort_by_distance(p)[0] for p in [
        (-10.672601, -100, -7.394305),
    ]]
    fillet(f7_3_edges, radius=F7_R_2)

    # F7#4 (call 4 of 4) (radius 1.25 in the source; OpenCascade refuses exactly that, so slightly less here)
    f7_4_edges = [f1_1.edges().sort_by_distance(p)[0] for p in [
        (10.672601, -100, -7.394305),
    ]]
    fillet(f7_4_edges, radius=F7_R_2)


solid = f1_1.part
